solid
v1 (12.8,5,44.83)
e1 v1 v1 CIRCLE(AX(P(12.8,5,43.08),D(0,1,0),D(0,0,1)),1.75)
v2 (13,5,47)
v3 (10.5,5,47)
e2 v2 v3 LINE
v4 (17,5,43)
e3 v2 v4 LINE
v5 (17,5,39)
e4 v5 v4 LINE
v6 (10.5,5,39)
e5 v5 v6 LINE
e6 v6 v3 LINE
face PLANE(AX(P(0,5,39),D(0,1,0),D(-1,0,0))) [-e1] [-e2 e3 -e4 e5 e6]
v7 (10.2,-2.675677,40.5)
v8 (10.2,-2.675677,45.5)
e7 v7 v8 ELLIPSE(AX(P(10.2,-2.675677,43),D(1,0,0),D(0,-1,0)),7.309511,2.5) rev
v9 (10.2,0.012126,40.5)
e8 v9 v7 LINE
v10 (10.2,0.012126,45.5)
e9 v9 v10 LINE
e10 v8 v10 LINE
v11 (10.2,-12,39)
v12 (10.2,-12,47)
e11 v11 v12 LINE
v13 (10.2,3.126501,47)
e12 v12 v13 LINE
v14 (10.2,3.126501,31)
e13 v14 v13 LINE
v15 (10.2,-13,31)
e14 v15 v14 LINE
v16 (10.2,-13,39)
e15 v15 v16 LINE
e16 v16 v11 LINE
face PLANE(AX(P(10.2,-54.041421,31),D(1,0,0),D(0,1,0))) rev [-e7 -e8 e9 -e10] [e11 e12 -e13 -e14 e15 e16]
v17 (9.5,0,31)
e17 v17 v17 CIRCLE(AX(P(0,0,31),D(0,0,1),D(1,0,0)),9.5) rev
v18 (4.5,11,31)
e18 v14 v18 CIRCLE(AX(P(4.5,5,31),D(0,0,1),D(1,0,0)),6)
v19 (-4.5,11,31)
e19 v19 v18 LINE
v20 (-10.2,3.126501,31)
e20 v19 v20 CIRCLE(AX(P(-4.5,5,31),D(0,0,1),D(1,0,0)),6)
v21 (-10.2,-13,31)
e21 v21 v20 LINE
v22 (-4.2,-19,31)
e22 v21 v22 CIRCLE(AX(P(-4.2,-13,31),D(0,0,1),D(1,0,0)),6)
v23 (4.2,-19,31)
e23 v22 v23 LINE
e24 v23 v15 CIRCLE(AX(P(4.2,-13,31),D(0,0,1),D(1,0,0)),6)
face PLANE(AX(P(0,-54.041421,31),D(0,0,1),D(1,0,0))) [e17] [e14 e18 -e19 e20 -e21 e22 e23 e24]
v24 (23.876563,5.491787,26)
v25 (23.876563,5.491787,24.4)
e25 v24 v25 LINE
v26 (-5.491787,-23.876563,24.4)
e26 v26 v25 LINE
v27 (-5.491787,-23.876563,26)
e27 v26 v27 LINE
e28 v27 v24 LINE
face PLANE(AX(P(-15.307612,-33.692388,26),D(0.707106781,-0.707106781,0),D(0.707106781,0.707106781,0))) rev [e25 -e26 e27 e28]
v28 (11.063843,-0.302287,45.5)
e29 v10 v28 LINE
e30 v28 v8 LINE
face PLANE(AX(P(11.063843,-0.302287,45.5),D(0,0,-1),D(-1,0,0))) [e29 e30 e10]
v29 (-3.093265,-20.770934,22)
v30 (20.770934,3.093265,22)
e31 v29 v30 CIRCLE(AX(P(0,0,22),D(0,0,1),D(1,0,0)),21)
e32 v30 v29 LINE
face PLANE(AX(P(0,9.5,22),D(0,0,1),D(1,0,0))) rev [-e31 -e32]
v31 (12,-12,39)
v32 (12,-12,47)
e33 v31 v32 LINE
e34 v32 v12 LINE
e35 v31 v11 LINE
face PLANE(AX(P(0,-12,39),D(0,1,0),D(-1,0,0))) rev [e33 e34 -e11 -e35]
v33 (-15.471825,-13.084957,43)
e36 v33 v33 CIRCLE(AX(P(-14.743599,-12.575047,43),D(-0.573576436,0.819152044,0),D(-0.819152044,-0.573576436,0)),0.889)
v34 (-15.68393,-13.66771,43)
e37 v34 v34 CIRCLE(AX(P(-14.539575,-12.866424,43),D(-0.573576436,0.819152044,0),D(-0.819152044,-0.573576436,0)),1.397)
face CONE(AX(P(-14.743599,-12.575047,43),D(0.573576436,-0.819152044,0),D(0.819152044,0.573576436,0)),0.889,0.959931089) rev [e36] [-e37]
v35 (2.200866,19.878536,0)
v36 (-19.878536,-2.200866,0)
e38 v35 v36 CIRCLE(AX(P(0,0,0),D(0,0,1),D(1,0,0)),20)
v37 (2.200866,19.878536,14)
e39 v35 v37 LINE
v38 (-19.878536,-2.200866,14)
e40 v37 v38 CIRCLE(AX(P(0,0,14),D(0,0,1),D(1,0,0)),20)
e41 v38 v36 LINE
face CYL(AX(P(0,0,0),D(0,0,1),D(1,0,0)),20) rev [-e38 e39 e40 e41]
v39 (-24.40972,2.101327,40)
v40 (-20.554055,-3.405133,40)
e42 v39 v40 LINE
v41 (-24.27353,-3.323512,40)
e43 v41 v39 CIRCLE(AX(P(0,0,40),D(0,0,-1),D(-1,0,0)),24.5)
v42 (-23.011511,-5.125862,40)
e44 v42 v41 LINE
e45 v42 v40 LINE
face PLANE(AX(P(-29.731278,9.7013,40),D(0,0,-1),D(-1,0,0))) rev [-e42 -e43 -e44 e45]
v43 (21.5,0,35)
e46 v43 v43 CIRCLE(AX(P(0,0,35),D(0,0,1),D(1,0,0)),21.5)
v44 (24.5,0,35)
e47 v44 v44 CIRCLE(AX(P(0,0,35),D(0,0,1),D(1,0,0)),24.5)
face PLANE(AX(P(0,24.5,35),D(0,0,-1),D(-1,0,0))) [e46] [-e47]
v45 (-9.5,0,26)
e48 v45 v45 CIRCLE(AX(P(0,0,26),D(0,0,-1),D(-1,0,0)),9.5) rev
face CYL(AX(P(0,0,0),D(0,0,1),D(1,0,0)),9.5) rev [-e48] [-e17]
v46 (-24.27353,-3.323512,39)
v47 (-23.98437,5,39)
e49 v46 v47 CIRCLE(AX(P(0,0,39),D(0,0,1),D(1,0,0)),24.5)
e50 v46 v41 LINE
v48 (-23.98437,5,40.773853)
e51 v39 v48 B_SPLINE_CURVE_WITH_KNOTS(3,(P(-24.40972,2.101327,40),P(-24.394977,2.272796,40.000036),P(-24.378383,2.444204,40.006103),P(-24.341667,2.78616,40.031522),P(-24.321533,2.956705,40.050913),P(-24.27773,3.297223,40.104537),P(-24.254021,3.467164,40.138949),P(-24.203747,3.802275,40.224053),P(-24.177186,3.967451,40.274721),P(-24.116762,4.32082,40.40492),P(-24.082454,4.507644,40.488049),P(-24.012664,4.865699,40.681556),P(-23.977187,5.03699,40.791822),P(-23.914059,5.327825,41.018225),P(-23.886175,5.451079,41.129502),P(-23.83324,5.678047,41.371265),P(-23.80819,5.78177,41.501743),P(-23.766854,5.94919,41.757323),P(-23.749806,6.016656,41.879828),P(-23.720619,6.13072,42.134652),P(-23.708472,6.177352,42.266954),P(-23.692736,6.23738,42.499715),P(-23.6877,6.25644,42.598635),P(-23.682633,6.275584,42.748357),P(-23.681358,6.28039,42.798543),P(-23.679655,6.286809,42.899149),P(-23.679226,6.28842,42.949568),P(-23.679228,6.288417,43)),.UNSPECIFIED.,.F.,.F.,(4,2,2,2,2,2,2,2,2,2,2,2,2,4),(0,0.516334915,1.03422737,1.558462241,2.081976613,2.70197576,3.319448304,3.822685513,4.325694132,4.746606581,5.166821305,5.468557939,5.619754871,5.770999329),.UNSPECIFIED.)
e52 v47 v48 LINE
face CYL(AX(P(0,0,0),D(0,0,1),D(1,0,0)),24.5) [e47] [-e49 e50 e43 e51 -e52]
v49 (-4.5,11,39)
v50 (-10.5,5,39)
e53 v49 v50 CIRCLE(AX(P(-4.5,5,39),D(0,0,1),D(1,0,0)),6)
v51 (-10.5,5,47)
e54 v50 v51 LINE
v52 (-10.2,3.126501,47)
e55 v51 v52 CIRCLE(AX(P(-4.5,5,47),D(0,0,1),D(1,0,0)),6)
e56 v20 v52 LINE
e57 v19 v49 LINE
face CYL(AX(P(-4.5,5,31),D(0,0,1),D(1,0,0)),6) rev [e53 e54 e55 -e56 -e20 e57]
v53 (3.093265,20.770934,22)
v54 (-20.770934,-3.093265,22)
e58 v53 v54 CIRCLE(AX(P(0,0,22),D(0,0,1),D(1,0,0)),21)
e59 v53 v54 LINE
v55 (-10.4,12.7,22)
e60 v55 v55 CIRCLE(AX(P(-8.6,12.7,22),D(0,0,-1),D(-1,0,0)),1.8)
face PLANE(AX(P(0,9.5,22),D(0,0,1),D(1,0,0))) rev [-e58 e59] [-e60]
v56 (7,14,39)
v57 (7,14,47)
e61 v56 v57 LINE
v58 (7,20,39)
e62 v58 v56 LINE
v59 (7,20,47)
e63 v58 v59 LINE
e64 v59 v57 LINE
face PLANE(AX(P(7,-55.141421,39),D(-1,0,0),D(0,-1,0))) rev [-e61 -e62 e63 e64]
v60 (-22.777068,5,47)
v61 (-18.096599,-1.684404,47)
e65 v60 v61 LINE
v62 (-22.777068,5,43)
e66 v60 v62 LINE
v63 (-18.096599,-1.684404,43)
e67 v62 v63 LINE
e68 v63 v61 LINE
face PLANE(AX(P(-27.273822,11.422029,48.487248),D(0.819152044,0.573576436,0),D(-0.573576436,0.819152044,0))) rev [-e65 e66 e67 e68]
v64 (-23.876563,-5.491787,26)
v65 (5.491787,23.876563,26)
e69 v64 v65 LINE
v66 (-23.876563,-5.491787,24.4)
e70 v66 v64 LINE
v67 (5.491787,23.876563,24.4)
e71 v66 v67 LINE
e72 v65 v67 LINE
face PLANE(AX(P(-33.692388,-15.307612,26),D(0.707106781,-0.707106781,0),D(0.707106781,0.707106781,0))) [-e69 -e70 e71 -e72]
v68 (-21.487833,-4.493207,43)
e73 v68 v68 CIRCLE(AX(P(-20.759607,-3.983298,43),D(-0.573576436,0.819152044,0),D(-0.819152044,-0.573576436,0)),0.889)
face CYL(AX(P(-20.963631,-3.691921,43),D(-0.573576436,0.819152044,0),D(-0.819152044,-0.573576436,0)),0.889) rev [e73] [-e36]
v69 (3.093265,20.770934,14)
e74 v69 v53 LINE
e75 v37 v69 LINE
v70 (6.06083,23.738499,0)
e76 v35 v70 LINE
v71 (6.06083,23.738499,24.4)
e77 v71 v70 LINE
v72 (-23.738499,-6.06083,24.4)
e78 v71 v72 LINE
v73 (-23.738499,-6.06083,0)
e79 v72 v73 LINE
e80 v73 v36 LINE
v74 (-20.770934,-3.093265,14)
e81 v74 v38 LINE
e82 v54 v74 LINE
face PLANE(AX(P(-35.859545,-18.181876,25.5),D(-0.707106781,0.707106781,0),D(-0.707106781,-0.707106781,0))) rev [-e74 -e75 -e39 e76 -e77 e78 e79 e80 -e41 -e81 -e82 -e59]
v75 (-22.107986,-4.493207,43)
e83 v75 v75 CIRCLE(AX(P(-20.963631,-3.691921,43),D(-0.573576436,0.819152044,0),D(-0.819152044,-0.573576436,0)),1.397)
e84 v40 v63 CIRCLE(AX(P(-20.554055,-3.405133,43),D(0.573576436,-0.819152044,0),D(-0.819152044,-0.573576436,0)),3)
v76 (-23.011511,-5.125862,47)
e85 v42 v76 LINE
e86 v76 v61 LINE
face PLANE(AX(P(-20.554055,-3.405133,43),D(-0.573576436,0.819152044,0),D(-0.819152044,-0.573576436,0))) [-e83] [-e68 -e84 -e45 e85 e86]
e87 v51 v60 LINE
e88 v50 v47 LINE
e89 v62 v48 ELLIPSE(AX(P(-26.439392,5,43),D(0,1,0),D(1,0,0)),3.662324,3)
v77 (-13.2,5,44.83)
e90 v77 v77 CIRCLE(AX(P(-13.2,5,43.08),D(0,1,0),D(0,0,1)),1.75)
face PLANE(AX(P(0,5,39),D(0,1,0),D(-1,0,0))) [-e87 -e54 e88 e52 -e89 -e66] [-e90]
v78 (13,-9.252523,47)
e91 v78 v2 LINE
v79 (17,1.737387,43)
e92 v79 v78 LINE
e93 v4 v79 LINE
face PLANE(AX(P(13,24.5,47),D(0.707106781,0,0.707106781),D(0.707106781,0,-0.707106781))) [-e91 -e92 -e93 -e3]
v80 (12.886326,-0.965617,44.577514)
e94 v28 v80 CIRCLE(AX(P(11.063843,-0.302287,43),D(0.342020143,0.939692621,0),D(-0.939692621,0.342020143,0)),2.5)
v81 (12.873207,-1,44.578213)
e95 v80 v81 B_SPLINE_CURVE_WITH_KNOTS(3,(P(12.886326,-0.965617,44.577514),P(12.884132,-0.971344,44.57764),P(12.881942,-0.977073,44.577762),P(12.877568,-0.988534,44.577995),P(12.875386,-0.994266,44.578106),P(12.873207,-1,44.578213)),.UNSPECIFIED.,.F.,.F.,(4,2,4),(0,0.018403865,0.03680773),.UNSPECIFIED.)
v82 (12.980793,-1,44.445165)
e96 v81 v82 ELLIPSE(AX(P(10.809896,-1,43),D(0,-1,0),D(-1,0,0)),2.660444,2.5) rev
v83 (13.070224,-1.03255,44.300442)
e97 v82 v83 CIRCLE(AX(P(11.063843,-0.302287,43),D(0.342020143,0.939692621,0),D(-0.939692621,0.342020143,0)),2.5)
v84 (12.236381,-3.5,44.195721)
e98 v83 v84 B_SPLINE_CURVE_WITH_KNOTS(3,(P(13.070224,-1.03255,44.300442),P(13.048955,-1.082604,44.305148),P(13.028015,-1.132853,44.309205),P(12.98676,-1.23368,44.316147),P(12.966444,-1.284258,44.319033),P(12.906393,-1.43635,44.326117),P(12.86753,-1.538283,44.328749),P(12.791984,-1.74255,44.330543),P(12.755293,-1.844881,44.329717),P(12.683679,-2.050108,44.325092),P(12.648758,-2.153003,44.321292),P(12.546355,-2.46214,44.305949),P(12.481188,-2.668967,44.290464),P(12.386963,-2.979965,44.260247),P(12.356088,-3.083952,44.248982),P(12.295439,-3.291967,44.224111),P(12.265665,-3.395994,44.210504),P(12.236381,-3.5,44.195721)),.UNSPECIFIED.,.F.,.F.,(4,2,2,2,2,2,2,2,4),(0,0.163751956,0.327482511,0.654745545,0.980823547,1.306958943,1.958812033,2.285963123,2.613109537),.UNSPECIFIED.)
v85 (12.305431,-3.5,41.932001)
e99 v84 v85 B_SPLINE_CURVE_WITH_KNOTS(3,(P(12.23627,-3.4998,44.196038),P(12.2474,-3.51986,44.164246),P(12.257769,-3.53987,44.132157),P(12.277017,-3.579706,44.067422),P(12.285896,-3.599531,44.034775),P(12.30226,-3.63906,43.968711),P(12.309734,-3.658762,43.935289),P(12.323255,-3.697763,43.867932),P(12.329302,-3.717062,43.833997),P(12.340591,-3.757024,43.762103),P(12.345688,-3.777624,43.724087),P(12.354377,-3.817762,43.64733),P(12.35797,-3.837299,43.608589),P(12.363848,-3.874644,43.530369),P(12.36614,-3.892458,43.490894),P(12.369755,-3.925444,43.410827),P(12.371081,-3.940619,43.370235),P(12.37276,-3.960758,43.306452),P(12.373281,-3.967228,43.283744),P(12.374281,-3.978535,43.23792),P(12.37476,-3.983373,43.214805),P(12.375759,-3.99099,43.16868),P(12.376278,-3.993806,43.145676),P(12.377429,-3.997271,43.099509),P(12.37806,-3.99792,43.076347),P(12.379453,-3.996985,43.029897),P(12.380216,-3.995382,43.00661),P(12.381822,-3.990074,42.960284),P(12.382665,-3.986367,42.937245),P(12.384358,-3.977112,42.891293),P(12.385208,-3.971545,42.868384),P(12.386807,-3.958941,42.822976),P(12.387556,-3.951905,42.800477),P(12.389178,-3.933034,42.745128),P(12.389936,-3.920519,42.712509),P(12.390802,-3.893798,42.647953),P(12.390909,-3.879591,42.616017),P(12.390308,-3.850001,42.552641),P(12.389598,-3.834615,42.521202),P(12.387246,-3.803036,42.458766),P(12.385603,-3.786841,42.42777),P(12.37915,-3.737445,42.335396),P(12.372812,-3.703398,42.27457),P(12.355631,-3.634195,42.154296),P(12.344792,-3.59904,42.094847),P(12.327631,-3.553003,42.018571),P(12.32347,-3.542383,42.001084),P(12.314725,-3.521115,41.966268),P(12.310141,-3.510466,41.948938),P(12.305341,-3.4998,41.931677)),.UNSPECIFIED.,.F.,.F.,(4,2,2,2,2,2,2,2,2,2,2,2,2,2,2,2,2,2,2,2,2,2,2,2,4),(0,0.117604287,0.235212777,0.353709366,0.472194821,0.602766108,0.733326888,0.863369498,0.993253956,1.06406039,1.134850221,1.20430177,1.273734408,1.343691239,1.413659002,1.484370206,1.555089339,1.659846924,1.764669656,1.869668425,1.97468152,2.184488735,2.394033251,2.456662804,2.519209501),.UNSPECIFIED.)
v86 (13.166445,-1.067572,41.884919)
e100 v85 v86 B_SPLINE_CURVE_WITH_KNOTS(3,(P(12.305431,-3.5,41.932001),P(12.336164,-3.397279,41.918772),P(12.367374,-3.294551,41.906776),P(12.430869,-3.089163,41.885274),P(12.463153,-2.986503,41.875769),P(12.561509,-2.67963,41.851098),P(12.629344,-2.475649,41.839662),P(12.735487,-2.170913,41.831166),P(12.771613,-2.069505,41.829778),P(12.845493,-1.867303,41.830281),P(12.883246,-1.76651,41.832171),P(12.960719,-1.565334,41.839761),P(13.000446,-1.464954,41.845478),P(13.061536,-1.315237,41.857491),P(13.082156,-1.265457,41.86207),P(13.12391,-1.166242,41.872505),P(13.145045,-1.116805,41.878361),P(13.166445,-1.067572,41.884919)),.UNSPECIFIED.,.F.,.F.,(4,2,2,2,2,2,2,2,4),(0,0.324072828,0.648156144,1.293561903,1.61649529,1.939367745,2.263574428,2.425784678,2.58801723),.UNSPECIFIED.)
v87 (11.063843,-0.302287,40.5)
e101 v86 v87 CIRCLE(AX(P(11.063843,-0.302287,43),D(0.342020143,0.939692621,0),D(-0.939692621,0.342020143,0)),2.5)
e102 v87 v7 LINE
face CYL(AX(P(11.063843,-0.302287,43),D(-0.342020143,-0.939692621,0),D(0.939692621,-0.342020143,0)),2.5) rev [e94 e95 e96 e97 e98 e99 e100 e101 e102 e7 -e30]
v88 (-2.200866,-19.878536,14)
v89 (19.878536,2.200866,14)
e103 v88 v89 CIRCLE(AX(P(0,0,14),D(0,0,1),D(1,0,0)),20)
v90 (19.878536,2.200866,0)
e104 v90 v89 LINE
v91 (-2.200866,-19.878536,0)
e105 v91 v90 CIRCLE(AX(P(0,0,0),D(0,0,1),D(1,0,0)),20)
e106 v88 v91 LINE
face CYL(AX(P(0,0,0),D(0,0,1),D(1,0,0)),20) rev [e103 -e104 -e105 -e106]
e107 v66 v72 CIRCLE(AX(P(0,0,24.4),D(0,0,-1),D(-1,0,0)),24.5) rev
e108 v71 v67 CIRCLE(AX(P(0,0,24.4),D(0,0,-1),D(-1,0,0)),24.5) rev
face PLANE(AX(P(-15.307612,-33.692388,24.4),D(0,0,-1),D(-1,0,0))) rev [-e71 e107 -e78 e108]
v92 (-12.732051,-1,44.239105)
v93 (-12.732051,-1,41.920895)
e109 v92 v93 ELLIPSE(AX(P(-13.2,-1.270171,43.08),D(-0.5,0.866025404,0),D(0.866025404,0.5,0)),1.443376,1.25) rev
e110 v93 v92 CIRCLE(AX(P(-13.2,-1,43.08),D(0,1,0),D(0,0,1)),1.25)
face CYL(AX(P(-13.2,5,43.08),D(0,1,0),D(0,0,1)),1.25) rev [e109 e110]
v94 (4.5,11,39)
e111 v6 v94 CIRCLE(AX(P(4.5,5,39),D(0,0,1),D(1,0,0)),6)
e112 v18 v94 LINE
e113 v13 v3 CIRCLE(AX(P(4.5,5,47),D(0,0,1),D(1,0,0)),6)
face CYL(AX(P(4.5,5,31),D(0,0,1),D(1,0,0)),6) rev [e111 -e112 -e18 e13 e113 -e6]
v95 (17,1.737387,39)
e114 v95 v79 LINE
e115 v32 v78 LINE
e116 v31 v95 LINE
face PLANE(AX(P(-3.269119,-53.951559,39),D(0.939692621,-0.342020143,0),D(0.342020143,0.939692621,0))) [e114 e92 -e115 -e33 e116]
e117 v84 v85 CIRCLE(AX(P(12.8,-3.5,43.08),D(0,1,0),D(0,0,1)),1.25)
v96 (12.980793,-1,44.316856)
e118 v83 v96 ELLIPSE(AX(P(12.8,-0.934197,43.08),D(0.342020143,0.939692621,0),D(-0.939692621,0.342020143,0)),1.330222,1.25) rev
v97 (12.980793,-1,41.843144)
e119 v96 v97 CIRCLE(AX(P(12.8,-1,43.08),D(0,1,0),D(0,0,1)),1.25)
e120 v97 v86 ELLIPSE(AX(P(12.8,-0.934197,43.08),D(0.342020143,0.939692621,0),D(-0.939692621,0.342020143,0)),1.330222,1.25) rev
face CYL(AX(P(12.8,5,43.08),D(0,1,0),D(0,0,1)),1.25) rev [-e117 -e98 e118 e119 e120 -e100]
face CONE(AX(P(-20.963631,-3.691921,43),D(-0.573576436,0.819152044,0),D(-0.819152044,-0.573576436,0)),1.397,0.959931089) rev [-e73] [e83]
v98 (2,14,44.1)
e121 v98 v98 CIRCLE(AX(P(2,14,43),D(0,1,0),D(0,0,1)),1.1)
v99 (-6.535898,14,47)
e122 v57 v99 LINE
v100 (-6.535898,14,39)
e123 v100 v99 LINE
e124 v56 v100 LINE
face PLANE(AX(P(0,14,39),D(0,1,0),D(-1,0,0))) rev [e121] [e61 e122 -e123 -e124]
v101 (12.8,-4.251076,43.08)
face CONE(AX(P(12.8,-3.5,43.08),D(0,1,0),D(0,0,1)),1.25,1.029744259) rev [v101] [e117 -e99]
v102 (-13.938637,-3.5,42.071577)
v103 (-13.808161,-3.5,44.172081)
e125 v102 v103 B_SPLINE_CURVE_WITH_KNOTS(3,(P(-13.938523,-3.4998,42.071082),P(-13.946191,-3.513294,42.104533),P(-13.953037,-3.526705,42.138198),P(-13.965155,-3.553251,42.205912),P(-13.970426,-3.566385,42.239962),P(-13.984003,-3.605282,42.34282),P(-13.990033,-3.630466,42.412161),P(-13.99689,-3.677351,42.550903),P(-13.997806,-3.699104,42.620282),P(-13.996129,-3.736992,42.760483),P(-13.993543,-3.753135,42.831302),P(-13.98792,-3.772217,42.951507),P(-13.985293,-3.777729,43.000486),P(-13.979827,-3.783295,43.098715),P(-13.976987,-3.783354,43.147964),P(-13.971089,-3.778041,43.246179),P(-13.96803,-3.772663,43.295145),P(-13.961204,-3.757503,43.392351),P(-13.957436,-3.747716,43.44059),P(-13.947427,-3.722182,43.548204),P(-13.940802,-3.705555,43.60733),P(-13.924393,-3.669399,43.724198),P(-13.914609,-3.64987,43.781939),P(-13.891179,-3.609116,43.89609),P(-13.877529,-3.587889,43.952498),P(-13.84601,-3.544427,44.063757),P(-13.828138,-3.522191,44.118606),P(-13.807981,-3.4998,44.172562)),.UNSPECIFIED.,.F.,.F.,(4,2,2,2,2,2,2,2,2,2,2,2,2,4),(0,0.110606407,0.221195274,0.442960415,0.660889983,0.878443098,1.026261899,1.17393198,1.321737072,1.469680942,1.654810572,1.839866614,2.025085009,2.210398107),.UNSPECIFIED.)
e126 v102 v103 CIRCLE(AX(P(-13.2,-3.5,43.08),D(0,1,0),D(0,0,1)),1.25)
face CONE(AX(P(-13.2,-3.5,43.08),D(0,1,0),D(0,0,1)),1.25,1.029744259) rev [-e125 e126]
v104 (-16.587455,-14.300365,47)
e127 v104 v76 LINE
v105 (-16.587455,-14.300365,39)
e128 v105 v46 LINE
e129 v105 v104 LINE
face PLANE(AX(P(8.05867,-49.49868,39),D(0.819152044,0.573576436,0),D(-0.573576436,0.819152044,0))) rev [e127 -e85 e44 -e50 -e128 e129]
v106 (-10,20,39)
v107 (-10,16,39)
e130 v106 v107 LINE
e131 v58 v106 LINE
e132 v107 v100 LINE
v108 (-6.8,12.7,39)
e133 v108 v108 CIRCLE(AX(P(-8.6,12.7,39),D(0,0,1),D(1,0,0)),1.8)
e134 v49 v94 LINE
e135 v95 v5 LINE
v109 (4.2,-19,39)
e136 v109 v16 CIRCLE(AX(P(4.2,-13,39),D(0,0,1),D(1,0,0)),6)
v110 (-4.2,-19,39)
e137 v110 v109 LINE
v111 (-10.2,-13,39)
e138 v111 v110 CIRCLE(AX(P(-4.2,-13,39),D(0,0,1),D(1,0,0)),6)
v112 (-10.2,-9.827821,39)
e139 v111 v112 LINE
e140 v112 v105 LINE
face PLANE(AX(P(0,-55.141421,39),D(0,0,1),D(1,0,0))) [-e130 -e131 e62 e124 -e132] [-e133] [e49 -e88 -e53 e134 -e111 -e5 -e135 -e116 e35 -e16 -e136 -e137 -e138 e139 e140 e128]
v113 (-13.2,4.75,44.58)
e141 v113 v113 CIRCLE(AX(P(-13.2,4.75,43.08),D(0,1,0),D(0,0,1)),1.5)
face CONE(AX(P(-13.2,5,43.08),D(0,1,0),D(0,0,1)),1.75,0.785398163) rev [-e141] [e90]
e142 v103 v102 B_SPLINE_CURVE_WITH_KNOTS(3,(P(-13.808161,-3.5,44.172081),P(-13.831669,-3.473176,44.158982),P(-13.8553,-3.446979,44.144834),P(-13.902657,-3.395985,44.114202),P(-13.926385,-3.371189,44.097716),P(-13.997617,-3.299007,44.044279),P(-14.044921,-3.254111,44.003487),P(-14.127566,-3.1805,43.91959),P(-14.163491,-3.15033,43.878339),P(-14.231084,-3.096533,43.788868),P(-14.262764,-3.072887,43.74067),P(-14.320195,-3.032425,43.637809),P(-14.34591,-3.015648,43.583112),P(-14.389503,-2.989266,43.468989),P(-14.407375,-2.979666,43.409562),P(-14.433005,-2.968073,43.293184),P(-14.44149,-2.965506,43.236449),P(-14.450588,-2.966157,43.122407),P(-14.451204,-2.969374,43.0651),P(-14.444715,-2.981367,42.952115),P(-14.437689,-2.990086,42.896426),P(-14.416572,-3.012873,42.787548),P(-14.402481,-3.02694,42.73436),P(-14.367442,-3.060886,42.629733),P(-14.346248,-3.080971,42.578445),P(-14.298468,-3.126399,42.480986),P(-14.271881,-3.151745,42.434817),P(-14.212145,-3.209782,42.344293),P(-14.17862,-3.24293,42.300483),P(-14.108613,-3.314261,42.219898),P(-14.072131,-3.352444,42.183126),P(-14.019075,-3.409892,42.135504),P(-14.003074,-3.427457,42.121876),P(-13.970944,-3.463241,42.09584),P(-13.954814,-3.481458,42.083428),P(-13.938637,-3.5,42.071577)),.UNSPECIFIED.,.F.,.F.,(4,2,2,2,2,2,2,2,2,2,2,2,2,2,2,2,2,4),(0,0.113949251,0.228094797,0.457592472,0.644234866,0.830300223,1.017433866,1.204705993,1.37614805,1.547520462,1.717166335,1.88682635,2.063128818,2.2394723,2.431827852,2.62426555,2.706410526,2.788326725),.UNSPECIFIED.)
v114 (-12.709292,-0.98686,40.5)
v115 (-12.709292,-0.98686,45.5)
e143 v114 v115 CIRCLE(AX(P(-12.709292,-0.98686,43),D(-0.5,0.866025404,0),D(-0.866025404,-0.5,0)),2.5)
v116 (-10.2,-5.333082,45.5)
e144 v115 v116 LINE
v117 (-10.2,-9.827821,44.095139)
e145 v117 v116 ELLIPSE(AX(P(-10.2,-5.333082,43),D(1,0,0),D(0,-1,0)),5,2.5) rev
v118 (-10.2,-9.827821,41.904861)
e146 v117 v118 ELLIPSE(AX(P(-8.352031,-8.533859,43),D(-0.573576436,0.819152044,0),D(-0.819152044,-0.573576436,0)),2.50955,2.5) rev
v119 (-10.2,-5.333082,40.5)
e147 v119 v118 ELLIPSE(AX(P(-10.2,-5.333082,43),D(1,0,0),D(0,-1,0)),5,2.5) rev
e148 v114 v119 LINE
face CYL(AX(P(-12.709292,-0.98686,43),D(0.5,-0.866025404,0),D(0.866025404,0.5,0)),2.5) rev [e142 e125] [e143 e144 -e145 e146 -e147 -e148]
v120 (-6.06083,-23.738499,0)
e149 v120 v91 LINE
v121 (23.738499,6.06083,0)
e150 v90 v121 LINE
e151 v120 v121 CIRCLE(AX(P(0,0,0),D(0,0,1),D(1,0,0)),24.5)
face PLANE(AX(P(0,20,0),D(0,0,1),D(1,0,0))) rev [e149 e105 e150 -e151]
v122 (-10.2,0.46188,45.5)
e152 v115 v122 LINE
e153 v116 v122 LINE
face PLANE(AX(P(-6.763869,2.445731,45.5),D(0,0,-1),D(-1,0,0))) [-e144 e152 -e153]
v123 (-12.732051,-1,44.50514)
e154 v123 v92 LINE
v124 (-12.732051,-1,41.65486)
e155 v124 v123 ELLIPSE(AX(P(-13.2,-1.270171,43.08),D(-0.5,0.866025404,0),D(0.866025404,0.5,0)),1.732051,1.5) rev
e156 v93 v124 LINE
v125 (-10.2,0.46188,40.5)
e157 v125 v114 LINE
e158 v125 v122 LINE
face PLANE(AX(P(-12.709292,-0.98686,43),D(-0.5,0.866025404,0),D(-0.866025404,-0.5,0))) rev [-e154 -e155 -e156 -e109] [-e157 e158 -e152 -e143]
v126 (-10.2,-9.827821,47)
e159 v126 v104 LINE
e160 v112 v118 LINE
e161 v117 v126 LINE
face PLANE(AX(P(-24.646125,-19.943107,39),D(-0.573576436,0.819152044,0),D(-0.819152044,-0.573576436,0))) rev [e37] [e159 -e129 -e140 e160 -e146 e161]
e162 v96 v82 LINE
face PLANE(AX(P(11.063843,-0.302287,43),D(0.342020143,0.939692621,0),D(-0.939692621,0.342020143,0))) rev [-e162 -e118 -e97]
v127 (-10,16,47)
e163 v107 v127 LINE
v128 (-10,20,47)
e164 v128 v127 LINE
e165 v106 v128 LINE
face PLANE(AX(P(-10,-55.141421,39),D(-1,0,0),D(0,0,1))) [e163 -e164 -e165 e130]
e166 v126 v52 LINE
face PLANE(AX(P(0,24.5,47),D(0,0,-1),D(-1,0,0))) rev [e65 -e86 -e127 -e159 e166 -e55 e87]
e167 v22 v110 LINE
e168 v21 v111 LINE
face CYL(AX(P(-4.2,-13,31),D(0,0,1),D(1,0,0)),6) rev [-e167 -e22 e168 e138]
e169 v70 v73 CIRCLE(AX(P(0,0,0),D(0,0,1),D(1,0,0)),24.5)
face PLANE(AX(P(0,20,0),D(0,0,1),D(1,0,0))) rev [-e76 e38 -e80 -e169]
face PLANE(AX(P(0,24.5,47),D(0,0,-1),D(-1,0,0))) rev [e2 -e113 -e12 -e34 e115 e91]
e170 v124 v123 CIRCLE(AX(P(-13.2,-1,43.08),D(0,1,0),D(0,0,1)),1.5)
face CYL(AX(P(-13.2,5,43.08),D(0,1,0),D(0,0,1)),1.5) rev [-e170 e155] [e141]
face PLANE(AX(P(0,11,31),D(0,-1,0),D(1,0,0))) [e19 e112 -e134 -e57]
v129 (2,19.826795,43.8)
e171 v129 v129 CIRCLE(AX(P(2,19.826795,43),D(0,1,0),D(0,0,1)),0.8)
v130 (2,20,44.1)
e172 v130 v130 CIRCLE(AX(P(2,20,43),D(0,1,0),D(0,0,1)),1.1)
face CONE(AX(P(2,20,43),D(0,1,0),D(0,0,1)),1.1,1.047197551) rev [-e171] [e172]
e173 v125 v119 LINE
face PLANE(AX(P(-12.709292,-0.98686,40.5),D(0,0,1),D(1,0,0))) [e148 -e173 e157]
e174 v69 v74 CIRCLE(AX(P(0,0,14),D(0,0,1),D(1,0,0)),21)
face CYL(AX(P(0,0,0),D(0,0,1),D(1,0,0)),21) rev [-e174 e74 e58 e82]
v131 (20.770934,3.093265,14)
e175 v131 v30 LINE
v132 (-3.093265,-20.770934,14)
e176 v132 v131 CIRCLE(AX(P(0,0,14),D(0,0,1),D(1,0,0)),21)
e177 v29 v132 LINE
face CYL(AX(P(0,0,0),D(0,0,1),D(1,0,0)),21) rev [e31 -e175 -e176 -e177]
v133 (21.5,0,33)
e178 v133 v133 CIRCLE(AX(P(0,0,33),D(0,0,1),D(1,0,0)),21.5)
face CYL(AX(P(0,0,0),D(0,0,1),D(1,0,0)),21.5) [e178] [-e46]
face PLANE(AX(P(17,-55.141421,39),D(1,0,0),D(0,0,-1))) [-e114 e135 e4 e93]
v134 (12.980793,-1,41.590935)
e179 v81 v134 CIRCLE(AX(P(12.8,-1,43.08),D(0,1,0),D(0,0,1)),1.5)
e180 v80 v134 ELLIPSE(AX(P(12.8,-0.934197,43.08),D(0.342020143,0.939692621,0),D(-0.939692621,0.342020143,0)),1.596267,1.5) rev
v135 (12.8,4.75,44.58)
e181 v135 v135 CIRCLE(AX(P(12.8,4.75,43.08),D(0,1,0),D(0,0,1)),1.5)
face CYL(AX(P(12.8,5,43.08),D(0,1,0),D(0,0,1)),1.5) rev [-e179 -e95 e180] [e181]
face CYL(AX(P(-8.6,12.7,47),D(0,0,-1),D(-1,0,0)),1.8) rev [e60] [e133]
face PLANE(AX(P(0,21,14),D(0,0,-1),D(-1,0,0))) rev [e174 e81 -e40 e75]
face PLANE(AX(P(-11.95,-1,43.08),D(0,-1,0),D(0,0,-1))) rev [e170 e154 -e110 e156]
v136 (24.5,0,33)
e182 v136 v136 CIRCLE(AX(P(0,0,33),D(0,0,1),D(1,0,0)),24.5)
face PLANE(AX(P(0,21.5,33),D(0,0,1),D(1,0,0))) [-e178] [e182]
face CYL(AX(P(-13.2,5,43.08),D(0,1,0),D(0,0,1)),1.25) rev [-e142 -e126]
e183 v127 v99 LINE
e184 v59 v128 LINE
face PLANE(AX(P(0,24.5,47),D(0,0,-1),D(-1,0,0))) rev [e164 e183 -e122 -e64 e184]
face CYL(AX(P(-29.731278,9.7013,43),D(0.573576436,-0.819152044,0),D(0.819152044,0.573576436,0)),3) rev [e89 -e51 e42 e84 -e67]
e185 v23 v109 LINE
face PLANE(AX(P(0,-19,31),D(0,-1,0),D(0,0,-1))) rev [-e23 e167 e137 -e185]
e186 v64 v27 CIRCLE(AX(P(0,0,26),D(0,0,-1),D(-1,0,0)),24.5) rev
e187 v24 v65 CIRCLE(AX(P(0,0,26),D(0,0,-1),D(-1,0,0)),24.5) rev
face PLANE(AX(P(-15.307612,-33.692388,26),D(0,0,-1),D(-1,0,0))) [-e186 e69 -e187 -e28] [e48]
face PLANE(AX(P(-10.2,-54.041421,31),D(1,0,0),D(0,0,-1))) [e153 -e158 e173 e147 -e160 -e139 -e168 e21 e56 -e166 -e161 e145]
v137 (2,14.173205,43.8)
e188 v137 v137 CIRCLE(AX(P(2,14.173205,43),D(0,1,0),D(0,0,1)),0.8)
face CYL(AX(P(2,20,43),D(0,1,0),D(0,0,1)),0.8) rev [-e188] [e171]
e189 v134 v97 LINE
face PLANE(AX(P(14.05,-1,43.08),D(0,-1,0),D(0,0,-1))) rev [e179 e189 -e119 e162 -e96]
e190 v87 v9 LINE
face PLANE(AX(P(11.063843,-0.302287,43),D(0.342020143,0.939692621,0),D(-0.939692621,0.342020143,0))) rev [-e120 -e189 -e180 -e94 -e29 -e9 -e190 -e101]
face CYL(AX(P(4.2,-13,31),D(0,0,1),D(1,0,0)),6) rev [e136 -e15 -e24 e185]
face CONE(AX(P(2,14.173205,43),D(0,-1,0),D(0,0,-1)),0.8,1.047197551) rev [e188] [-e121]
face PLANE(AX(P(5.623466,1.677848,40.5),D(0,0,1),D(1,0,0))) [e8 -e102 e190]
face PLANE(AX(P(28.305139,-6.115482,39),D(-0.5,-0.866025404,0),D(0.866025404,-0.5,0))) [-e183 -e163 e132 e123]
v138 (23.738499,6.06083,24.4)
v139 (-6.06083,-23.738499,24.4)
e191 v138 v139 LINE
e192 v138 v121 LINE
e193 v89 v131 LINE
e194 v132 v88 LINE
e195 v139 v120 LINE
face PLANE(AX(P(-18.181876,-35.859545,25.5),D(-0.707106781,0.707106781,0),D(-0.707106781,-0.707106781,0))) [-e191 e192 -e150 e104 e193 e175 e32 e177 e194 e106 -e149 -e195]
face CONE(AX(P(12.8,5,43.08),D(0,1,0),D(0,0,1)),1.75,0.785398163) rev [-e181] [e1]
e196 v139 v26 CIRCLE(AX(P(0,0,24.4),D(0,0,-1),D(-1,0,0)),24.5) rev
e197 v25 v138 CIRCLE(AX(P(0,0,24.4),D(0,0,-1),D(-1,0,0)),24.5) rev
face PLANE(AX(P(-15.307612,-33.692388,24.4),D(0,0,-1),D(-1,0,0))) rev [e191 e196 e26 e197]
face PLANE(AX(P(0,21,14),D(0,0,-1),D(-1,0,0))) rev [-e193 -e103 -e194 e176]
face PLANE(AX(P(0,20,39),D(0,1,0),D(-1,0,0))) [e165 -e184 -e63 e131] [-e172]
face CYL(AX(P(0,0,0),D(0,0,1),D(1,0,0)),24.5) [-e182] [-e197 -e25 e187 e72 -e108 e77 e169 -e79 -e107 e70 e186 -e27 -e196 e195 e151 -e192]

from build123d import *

# Parameters (mm, degrees)
CUT_EXTRUDE_7_DEPTH        = 16
CUT_EXTRUDE_START          = -25.5
CUT_EXTRUDE_3_OUTLINE_R    = 9.5
CUT_EXTRUDE_3_DEPTH        = 25.5
CUT_EXTRUDE_4_DEPTH        = 8
SKETCH_18_R                = 1.25
CUT_EXTRUDE_10_DEPTH       = 5
HOLE_WIZARD_M31_AT_2_COUNT = 2
HOLE_WIZARD_M31_AT_2_PITCH = 26
CHAMFER_1_SIZE             = 4
SKETCH_20_R                = 1.8
CUT_EXTRUDE_1_DEPTH        = 43.725870383
CUT_EXTRUDE_12_DEPTH       = 15
CUT_EXTRUDE_13_DEPTH       = 13
CUT_EXTRUDE_START_2        = -11.2
CUT_EXTRUDE_14_DEPTH       = 16
CUT_EXTRUDE_15_DEPTH       = 59.390924036
CUT_EXTRUDE_15_DEPTH_BACK  = 59.390924036
SKETCH_30_W                = 26
SKETCH_30_H                = 1.6


# Read off the part's stored shape, not the designer's step: the extrude step
with BuildPart() as part:
    # Sketch 2 → Revolve 2 (revolve)
    with BuildSketch(Plane(origin=(0, 0, 0), x_dir=(0, 0, -1), z_dir=(1, 0, 0)), mode=Mode.PRIVATE) as revolve_2_sk:
        Polygon((-47, 9.5), (-22, 9.5), (-22, 21), (-14, 21), (-14, 20), (0, 20), (0, 24.5), (-33, 24.5), (-33, 21.5), (-35, 21.5), (-35, 24.5), (-47, 24.5), align=None)
    revolve(revolve_2_sk.sketch.rotate(Axis((0, 0, 0), (0, 0, -1)), 90), axis=Axis((0, 0, 0), (0, 0, -1)))

    # Sketch 11 → Cut-Extrude 7 (cut)
    with BuildSketch(Plane.XY.offset(47)):
        with BuildLine():
            Line((-4.2, -19), (4.2, -19))
            ThreePointArc((4.2, -19), (8.442640687, -17.242640687), (10.2, -13))
            Line((10.2, -13), (10.2, 3.1265006))
            ThreePointArc((10.2, 3.1265006), (9.360092406, 8.51845162), (4.5, 11))
            Line((4.5, 11), (-4.5, 11))
            ThreePointArc((-4.5, 11), (-9.360092406, 8.51845162), (-10.2, 3.1265006))
            Line((-10.2, 3.1265006), (-10.2, -13))
            ThreePointArc((-10.2, -13), (-8.442640687, -17.242640687), (-4.2, -19))
        make_face()
    extrude(amount=-CUT_EXTRUDE_7_DEPTH, mode=Mode.SUBTRACT)

    # Cut-Extrude 3 outline → Cut-Extrude 3 (cut)
    with BuildSketch(Plane(origin=(0, 0, 0), x_dir=(-1, 0, 0), z_dir=(0, 0, -1)).offset(CUT_EXTRUDE_START)):
        with BuildLine():
            ThreePointArc((6.060829661, -23.738499191), (17.324116139, -17.324116139), (23.738499191, -6.060829661))
            Line((23.738499191, -6.060829661), (-6.060829661, 23.738499191))
            ThreePointArc((-6.060829661, 23.738499191), (-17.324116139, 17.324116139), (-23.738499191, 6.060829661))
            Line((-23.738499191, 6.060829661), (6.060829661, -23.738499191))
        make_face()
        Circle(CUT_EXTRUDE_3_OUTLINE_R, mode=Mode.SUBTRACT)
    extrude(amount=CUT_EXTRUDE_3_DEPTH, mode=Mode.SUBTRACT)

    # Sketch 5 → Cut-Extrude 4 (cut)
    with BuildSketch(Plane.XY.offset(47)):
        with BuildLine():
            Line((17, 5), (17, 1.737387097))
            Line((17, 1.737387097), (12, -12))
            Line((12, -12), (10.2, -12))
            Line((10.2, -12), (10.2, -13))
            ThreePointArc((10.2, -13), (8.442640687, -17.242640687), (4.2, -19))
            Line((4.2, -19), (-4.2, -19))
            ThreePointArc((-4.2, -19), (-8.442640687, -17.242640687), (-10.2, -13))
            Line((-10.2, -13), (-10.2, -9.827820985))
            Line((-10.2, -9.827820985), (-16.587454885, -14.300365046))
            Line((-16.587454885, -14.300365046), (-24.273530206, -3.323511896))
            ThreePointArc((-24.273530206, -3.323511896), (1.66560949, -24.443316981), (24.5, 0))
            ThreePointArc((24.5, 0), (2.513258562, 24.370751556), (-23.98436991, 5))
            Line((-23.98436991, 5), (-10.5, 5))
            ThreePointArc((-10.5, 5), (-8.742640687, 9.242640687), (-4.5, 11))
            Line((-4.5, 11), (4.5, 11))
            ThreePointArc((4.5, 11), (8.742640687, 9.242640687), (10.5, 5))
            Line((10.5, 5), (17, 5))
        make_face()
        Polygon((-10, 20), (7, 20), (7, 14), (-6.535898385, 14), (-10, 16), align=None, mode=Mode.SUBTRACT)
    extrude(amount=-CUT_EXTRUDE_4_DEPTH, mode=Mode.SUBTRACT)

    # Sketch 18 → Cut-Extrude 10 (cut)
    with BuildSketch(Plane(origin=(0, 5, 0), x_dir=(1, 0, 0), z_dir=(0, 1, 0))):
        with Locations(Location((-13.2, -43.08, 0), (0, 0, 180))):
            Circle(SKETCH_18_R)
        with Locations(Location((12.8, -43.08, 0), (0, 0, 180))):
            Circle(SKETCH_18_R)
    extrude(amount=-CUT_EXTRUDE_10_DEPTH, mode=Mode.SUBTRACT)

    # Sketch 24 → Hole Wizard M31 (revolve, cut)
    with BuildSketch(Plane(origin=(-13.2, 5, 43.08), x_dir=(0, 0, 1), z_dir=(1, 0, 0))):
        Polygon((0, 0), (0, 9.251075774), (1.25, 8.5), (1.25, 6), (1.5, 6), (1.5, 0.25), (1.75, 0), align=None)
    hole_wizard_m31 = revolve(axis=Axis((-13.2, 11.35, 43.08), (0, -1, 0)), mode=Mode.SUBTRACT)

    # Hole Wizard M31 at 2: Hole Wizard M31 ×2
    with Locations(*[(i * HOLE_WIZARD_M31_AT_2_PITCH, 0, 0) for i in range(1, HOLE_WIZARD_M31_AT_2_COUNT)]):
        add(hole_wizard_m31, mode=Mode.SUBTRACT)

    # Chamfer 1
    chamfer_1_edges = [part.edges().sort_by_distance(p)[0] for p in [
        (17, 3.368693549, 47),
    ]]
    chamfer(chamfer_1_edges, length=CHAMFER_1_SIZE)

    # Sketch 20 → Cut-Extrude 1 (cut, through all)
    with BuildSketch(Plane(origin=(0, 0, 22), x_dir=(-1, 0, 0), z_dir=(0, 0, -1))):
        with Locations((8.6, 12.7)):
            Circle(SKETCH_20_R)
    extrude(amount=-CUT_EXTRUDE_1_DEPTH, mode=Mode.SUBTRACT)

    # Sketch 21 → Hole Wizard M21 (revolve, cut)
    with BuildSketch(Plane(origin=(2, 20, 43), x_dir=(0, 0, 1), z_dir=(1, 0, 0))):
        Polygon((0, 0), (0, 6), (1.1, 6), (0.8, 5.826794919), (0.8, 0.173205081), (1.1, 0), align=None)
    revolve(axis=Axis((2, 26.35, 43), (0, -1, 0)), mode=Mode.SUBTRACT)

    # Sketch 23 → Cut-Extrude 12 (cut)
    with BuildSketch(Plane(origin=(4.75, -8.227241336, 0), x_dir=(0, 0, -1), z_dir=(-0.499999999999998, 0.8660254037844398, 0))):
        with BuildLine():
            Line((-40.5, 11.5), (-40.5, 4.634817269))
            Line((-40.5, 4.634817269), (-45.5, 4.634817269))
            Line((-45.5, 4.634817269), (-45.5, 11.5))
            ThreePointArc((-45.5, 11.5), (-43, 14), (-40.5, 11.5))
        make_face()
    extrude(amount=CUT_EXTRUDE_12_DEPTH, mode=Mode.SUBTRACT)

    # Sketch 26 → Cut-Extrude 13 (cut)
    with BuildSketch(Plane(origin=(-3.249191362, -8.927079897, 0), x_dir=(0, 0, 1), z_dir=(0.3420201433256694, 0.9396926207859083, 0))):
        with BuildLine():
            Line((45.5, 10.5), (45.5, 4.710471755))
            Line((45.5, 4.710471755), (40.5, 4.710471755))
            Line((40.5, 4.710471755), (40.5, 10.5))
            ThreePointArc((40.5, 10.5), (43, 13), (45.5, 10.5))
        make_face()
    extrude(amount=CUT_EXTRUDE_13_DEPTH, mode=Mode.SUBTRACT)

    # Sketch 27 → Cut-Extrude 14 (cut)
    with BuildSketch(Plane(origin=(1.26186816, -1.802134497, 0), x_dir=(0.8191520442889928, 0.5735764363510447, 0), z_dir=(0.5735764363510447, -0.8191520442889928, 0)).offset(CUT_EXTRUDE_START_2)):
        with BuildLine():
            Line((-18.79, 40), (-27.979598057, 40))
            Line((-27.979598057, 40), (-27.979598057, 48.487247608))
            Line((-27.979598057, 48.487247608), (-15.79, 48.487247608))
            Line((-15.79, 48.487247608), (-15.79, 43))
            ThreePointArc((-15.79, 43), (-16.668679656, 40.878679656), (-18.79, 40))
        make_face()
    extrude(amount=-CUT_EXTRUDE_14_DEPTH, mode=Mode.SUBTRACT)

    # Sketch 28 → Hole Wizard 2-561 (revolve, cut)
    with BuildSketch(Plane(origin=(-20.963630861, -3.691921059, 43), x_dir=(-0.8191520442889927, -0.5735764363510447, 0), z_dir=(0, 0, 1))):
        Polygon((0, 0), (0, 11.2), (1.397, 11.2), (0.889, 10.844294571), (0.889, 0.355705429), (1.397, 0), align=None)
    revolve(axis=Axis((-24.605841232, 1.509694423, 43), (0.5735764363510447, -0.8191520442889927, 0)), mode=Mode.SUBTRACT)

    # Sketch 30 → Cut-Extrude 15 (cut, two sides: drawn at the far end of the back side and taken through both)
    with BuildSketch(Plane(origin=(0, 0, 0), x_dir=(-0.7071067811865464, 0.7071067811865488, 0), z_dir=(0.7071067811865488, 0.7071067811865464, 0)).offset(-CUT_EXTRUDE_15_DEPTH_BACK)):
        with Locations((0, 25.2)):
            Rectangle(SKETCH_30_W, SKETCH_30_H)
    extrude(amount=CUT_EXTRUDE_15_DEPTH + CUT_EXTRUDE_15_DEPTH_BACK, mode=Mode.SUBTRACT)


solid = part.part
